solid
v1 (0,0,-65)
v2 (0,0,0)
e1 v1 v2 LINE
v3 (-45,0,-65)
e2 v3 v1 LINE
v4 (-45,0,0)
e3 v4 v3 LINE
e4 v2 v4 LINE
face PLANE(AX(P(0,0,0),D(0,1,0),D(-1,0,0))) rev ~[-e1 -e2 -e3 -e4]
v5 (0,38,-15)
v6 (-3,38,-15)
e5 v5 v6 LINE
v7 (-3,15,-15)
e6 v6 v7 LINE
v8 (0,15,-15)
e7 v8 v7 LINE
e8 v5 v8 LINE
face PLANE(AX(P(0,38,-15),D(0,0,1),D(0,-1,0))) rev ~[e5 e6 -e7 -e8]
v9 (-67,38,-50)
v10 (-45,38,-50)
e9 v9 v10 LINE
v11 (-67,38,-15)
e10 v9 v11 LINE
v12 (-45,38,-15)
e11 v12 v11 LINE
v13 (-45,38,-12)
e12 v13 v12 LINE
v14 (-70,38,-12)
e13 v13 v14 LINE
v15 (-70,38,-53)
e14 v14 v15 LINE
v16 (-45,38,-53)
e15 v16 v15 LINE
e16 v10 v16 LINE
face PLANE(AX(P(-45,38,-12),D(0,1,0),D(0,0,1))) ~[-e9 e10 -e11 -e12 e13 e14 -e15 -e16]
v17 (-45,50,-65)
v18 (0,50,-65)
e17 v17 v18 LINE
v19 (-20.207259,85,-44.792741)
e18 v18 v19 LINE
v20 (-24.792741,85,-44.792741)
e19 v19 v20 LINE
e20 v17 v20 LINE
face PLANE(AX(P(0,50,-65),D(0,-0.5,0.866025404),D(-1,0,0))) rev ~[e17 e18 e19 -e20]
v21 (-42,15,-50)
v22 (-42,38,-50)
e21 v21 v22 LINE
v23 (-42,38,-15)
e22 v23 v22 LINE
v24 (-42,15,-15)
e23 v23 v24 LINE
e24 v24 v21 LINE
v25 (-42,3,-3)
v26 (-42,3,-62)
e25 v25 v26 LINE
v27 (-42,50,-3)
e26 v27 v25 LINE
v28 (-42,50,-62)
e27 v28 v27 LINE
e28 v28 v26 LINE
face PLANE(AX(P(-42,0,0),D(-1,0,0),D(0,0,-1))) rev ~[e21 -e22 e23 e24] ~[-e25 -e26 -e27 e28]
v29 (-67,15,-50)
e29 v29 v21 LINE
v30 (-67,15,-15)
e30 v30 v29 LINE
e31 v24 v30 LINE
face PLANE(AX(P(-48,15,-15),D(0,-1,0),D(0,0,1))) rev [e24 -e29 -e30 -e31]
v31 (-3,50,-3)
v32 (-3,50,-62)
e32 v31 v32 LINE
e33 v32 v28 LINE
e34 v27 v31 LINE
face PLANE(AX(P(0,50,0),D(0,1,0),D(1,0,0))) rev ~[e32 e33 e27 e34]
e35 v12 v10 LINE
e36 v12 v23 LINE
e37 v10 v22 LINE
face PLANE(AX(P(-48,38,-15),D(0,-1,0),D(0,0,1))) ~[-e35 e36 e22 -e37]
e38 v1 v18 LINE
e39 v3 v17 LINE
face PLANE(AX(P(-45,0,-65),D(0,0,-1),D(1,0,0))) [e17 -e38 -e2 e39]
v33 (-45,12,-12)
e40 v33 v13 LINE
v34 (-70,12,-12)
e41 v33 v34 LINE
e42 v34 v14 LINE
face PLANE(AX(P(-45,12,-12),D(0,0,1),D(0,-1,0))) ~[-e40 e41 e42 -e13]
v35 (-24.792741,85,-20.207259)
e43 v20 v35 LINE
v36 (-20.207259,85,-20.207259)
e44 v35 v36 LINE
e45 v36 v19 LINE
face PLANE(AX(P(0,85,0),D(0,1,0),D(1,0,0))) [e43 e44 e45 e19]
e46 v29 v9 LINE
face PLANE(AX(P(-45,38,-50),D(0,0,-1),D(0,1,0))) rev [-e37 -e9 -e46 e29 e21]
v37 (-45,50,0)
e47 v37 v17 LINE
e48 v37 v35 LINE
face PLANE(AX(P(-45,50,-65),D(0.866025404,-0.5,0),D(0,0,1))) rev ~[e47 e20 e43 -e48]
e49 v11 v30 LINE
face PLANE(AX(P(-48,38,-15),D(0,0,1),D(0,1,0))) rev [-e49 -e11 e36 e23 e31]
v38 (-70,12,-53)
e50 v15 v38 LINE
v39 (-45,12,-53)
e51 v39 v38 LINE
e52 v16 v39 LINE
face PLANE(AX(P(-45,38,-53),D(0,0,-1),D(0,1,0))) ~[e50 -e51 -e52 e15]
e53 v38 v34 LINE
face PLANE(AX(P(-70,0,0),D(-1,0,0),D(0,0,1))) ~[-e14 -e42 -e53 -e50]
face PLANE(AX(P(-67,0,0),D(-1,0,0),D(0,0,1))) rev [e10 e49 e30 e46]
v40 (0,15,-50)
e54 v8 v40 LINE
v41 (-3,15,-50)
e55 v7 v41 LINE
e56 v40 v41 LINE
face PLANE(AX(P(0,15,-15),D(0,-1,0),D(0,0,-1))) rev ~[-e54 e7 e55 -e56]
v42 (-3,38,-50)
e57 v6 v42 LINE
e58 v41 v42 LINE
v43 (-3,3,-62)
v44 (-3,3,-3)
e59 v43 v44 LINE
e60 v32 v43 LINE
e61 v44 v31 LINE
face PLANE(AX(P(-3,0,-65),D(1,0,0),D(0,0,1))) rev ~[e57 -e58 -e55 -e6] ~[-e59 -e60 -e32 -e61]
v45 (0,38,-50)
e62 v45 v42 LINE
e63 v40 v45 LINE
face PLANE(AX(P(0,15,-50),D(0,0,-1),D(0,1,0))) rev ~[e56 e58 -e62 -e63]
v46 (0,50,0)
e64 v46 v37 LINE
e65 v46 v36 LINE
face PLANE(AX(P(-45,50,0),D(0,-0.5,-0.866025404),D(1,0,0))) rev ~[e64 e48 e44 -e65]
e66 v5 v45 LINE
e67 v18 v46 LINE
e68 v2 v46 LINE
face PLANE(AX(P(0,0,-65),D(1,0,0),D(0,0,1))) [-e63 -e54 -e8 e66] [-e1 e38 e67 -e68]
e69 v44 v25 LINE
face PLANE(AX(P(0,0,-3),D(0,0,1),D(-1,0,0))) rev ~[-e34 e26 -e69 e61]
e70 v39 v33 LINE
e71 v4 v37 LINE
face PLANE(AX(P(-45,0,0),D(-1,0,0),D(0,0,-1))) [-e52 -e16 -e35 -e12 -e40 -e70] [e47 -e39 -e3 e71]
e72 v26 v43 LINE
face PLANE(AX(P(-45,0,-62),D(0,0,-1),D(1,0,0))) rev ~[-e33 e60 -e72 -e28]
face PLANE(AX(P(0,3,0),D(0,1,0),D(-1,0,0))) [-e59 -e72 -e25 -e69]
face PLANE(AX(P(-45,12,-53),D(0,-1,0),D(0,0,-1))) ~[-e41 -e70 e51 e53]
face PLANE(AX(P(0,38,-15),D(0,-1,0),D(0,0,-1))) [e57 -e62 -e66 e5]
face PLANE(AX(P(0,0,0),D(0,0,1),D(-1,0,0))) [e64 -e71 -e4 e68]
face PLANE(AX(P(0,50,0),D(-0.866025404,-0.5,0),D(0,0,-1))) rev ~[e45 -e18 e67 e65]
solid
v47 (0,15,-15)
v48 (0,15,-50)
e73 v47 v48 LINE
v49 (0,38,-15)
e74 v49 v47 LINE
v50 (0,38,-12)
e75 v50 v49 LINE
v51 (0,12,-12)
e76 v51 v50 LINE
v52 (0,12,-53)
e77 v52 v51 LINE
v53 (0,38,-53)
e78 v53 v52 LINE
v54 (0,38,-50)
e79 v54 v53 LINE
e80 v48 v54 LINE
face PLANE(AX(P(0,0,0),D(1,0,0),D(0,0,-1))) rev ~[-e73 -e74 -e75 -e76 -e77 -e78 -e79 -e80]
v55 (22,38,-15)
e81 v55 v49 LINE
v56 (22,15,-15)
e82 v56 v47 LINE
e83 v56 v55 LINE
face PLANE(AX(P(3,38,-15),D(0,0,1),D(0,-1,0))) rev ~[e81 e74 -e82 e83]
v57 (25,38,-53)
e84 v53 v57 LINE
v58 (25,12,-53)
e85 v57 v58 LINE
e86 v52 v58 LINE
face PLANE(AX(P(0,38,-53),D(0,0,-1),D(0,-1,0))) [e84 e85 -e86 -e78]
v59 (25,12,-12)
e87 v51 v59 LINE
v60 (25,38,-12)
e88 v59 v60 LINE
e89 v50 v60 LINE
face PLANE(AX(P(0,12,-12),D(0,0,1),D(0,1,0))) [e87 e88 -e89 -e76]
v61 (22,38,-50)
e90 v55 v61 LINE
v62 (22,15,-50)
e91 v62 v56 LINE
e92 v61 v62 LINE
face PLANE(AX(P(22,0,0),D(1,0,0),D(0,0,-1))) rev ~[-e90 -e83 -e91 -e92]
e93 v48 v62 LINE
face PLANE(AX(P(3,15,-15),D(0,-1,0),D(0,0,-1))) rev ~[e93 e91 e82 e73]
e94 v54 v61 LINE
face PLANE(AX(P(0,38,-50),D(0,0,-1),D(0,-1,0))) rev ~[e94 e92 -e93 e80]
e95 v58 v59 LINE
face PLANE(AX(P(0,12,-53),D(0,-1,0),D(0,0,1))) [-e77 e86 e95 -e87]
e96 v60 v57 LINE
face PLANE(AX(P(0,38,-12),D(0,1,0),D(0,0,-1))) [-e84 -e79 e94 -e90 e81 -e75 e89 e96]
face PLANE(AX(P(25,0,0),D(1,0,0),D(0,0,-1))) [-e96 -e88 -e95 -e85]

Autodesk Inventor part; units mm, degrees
ref_plane "YZ Plane" through (0, 0, 0) normal (1, 0, 0) x (0, 1, 0)
ref_plane "XZ Plane" through (0, 0, 0) normal (0, 1, 0) x (-1, 0, 0)
sketch "草圖1" plane through (0, 0, 0) normal (0, 1, 0) x (-1, 0, 0)
  line L0 (0, 0) -> (45, 0)
  line L1 (45, 0) -> (45, -65)
  line L2 (45, -65) -> (0, -65)
  line L3 (0, -65) -> (0, 0)
  dimension "d0" = 45
  dimension "d1" = 65
extrude "擠出1" add sketch "草圖1" along normal blind 50
shell "薄殼1" thickness 3 removed faces 1 at (-15, 50, -21.666667)
sketch "草圖2" plane through (0, 0, 0) normal (1, 0, 0) x (0, 0, -1)
  line L0 (65, 50) -> (65, 0) projected
  line L1 (65, 0) -> (0, 0) projected
  line L2 (0, 0) -> (0, 50) projected
  line L3 (0, 50) -> (65, 50) projected
  line L4 (53, 38) -> (53, 12)
  line L5 (53, 12) -> (12, 12)
  line L6 (12, 12) -> (12, 38)
  line L7 (12, 38) -> (53, 38)
  dimension "d5" = 12
extrude "擠出2" add sketch "草圖2" along normal blind 25 separate body contours L4 L5 L6 L7
shell "薄殼2" thickness 3 removed faces 1 at (8.333333, 38, -39.333333) bodies 2
ref_plane "工作平面1" through (-22.5, 0, 0) normal (1, 0, 0) x (0, 0, -1)
sketch "草圖3" plane through (3, 15, -15) normal (1, 0, 0) x (0, 0, -1)
  line L0 (35, 0) -> (35, 23) projected
  line L1 (0, 23) -> (35, 23) projected
  line L2 (-3, 23) -> (0, 23) projected
  line L3 (-3, -3) -> (-3, 23) projected
  line L4 (38, -3) -> (-3, -3) projected
  line L5 (38, 23) -> (38, -3) projected
  line L6 (35, 23) -> (38, 23) projected
  line L7 (0, 0) -> (35, 0) projected
  line L8 (0, 23) -> (0, 0) projected
  point P0 (-15, -15)
extrude "擠出3" cut sketch "草圖3" against normal blind 25 contours L7 L8 L1 L0 bodies 2
sketch "草圖4" plane through (0, 0, 0) normal (1, 0, 0) x (0, 0, -1)
  line L0 (65, 50) -> (65, 0) projected
  line L1 (65, 0) -> (0, 0) projected
  line L2 (0, 0) -> (0, 50) projected
  line L3 (0, 50) -> (65, 50) projected
  line L4 (50, 38) -> (53, 38) projected
  line L5 (53, 38) -> (53, 12) projected
  line L6 (53, 12) -> (12, 12) projected
  line L7 (12, 12) -> (12, 38) projected
  line L8 (12, 38) -> (15, 38) projected
  line L9 (15, 38) -> (15, 15) projected
  line L10 (15, 15) -> (50, 15) projected
  line L11 (50, 15) -> (50, 38) projected
  line L12 (15, 38) -> (50, 38)
  line L13 (50, 38) -> (50, 15)
  line L14 (50, 15) -> (15, 15)
  line L15 (15, 15) -> (15, 38)
extrude "擠出4" cut sketch "草圖4" against normal blind 10 contours L11 L10 L9 L12 bodies 1
mirror "鏡射1" about plane through (-22.5, 0, 0) normal (1, 0, 0) of "擠出4", "擠出2", "擠出3" bodies 1
shell "薄殼3" thickness 3 removed faces 1 at (-62.666667, 38, -26.666667) bodies 1
sketch "草圖5" plane through (-51, 15, -15) normal (-1, 0, 0) x (0, 0, 1)
  line L0 (0, 0) -> (0, 23) projected
  line L1 (-35, 23) -> (0, 23) projected
  line L2 (-38, 23) -> (-35, 23) projected
  line L3 (-38, -3) -> (-38, 23) projected
  line L4 (3, -3) -> (-38, -3) projected
  line L5 (3, 23) -> (3, -3) projected
  line L6 (0, 23) -> (3, 23) projected
  line L7 (-35, 0) -> (0, 0) projected
  line L8 (-35, 23) -> (-35, 0) projected
  point P0 (15, -15)
extrude "擠出5" cut sketch "草圖5" against normal blind 10 contours L7 L8 L1 L0 bodies 1
sketch "草圖6" plane through (0, 50, 0) normal (0, 1, 0) x (1, 0, 0)
  line L0 (-3, 3) -> (-3, 62) projected
  line L1 (-3, 62) -> (-42, 62) projected
  line L2 (-42, 62) -> (-42, 3) projected
  line L3 (-42, 3) -> (-3, 3) projected
  line L4 (0, 65) -> (0, 0) projected
  line L5 (0, 0) -> (-45, 0) projected
  line L6 (-45, 0) -> (-45, 65) projected
  line L7 (-45, 65) -> (0, 65) projected
sketch "草圖6 outline for 擠出6" plane through (0, 50, 0) normal (0, 1, 0) x (1, 0, 0)
  line L0 (0, 65) -> (-45, 65)
  line L1 (0, 0) -> (0, 65)
  line L2 (-45, 0) -> (0, 0)
  line L3 (-45, 65) -> (-45, 0)
extrude "擠出6" add sketch "草圖6 outline for 擠出6" along normal blind 35 draft -30 bodies 1
properties part number "110033226_ipt_55_內城堡屋頂"
